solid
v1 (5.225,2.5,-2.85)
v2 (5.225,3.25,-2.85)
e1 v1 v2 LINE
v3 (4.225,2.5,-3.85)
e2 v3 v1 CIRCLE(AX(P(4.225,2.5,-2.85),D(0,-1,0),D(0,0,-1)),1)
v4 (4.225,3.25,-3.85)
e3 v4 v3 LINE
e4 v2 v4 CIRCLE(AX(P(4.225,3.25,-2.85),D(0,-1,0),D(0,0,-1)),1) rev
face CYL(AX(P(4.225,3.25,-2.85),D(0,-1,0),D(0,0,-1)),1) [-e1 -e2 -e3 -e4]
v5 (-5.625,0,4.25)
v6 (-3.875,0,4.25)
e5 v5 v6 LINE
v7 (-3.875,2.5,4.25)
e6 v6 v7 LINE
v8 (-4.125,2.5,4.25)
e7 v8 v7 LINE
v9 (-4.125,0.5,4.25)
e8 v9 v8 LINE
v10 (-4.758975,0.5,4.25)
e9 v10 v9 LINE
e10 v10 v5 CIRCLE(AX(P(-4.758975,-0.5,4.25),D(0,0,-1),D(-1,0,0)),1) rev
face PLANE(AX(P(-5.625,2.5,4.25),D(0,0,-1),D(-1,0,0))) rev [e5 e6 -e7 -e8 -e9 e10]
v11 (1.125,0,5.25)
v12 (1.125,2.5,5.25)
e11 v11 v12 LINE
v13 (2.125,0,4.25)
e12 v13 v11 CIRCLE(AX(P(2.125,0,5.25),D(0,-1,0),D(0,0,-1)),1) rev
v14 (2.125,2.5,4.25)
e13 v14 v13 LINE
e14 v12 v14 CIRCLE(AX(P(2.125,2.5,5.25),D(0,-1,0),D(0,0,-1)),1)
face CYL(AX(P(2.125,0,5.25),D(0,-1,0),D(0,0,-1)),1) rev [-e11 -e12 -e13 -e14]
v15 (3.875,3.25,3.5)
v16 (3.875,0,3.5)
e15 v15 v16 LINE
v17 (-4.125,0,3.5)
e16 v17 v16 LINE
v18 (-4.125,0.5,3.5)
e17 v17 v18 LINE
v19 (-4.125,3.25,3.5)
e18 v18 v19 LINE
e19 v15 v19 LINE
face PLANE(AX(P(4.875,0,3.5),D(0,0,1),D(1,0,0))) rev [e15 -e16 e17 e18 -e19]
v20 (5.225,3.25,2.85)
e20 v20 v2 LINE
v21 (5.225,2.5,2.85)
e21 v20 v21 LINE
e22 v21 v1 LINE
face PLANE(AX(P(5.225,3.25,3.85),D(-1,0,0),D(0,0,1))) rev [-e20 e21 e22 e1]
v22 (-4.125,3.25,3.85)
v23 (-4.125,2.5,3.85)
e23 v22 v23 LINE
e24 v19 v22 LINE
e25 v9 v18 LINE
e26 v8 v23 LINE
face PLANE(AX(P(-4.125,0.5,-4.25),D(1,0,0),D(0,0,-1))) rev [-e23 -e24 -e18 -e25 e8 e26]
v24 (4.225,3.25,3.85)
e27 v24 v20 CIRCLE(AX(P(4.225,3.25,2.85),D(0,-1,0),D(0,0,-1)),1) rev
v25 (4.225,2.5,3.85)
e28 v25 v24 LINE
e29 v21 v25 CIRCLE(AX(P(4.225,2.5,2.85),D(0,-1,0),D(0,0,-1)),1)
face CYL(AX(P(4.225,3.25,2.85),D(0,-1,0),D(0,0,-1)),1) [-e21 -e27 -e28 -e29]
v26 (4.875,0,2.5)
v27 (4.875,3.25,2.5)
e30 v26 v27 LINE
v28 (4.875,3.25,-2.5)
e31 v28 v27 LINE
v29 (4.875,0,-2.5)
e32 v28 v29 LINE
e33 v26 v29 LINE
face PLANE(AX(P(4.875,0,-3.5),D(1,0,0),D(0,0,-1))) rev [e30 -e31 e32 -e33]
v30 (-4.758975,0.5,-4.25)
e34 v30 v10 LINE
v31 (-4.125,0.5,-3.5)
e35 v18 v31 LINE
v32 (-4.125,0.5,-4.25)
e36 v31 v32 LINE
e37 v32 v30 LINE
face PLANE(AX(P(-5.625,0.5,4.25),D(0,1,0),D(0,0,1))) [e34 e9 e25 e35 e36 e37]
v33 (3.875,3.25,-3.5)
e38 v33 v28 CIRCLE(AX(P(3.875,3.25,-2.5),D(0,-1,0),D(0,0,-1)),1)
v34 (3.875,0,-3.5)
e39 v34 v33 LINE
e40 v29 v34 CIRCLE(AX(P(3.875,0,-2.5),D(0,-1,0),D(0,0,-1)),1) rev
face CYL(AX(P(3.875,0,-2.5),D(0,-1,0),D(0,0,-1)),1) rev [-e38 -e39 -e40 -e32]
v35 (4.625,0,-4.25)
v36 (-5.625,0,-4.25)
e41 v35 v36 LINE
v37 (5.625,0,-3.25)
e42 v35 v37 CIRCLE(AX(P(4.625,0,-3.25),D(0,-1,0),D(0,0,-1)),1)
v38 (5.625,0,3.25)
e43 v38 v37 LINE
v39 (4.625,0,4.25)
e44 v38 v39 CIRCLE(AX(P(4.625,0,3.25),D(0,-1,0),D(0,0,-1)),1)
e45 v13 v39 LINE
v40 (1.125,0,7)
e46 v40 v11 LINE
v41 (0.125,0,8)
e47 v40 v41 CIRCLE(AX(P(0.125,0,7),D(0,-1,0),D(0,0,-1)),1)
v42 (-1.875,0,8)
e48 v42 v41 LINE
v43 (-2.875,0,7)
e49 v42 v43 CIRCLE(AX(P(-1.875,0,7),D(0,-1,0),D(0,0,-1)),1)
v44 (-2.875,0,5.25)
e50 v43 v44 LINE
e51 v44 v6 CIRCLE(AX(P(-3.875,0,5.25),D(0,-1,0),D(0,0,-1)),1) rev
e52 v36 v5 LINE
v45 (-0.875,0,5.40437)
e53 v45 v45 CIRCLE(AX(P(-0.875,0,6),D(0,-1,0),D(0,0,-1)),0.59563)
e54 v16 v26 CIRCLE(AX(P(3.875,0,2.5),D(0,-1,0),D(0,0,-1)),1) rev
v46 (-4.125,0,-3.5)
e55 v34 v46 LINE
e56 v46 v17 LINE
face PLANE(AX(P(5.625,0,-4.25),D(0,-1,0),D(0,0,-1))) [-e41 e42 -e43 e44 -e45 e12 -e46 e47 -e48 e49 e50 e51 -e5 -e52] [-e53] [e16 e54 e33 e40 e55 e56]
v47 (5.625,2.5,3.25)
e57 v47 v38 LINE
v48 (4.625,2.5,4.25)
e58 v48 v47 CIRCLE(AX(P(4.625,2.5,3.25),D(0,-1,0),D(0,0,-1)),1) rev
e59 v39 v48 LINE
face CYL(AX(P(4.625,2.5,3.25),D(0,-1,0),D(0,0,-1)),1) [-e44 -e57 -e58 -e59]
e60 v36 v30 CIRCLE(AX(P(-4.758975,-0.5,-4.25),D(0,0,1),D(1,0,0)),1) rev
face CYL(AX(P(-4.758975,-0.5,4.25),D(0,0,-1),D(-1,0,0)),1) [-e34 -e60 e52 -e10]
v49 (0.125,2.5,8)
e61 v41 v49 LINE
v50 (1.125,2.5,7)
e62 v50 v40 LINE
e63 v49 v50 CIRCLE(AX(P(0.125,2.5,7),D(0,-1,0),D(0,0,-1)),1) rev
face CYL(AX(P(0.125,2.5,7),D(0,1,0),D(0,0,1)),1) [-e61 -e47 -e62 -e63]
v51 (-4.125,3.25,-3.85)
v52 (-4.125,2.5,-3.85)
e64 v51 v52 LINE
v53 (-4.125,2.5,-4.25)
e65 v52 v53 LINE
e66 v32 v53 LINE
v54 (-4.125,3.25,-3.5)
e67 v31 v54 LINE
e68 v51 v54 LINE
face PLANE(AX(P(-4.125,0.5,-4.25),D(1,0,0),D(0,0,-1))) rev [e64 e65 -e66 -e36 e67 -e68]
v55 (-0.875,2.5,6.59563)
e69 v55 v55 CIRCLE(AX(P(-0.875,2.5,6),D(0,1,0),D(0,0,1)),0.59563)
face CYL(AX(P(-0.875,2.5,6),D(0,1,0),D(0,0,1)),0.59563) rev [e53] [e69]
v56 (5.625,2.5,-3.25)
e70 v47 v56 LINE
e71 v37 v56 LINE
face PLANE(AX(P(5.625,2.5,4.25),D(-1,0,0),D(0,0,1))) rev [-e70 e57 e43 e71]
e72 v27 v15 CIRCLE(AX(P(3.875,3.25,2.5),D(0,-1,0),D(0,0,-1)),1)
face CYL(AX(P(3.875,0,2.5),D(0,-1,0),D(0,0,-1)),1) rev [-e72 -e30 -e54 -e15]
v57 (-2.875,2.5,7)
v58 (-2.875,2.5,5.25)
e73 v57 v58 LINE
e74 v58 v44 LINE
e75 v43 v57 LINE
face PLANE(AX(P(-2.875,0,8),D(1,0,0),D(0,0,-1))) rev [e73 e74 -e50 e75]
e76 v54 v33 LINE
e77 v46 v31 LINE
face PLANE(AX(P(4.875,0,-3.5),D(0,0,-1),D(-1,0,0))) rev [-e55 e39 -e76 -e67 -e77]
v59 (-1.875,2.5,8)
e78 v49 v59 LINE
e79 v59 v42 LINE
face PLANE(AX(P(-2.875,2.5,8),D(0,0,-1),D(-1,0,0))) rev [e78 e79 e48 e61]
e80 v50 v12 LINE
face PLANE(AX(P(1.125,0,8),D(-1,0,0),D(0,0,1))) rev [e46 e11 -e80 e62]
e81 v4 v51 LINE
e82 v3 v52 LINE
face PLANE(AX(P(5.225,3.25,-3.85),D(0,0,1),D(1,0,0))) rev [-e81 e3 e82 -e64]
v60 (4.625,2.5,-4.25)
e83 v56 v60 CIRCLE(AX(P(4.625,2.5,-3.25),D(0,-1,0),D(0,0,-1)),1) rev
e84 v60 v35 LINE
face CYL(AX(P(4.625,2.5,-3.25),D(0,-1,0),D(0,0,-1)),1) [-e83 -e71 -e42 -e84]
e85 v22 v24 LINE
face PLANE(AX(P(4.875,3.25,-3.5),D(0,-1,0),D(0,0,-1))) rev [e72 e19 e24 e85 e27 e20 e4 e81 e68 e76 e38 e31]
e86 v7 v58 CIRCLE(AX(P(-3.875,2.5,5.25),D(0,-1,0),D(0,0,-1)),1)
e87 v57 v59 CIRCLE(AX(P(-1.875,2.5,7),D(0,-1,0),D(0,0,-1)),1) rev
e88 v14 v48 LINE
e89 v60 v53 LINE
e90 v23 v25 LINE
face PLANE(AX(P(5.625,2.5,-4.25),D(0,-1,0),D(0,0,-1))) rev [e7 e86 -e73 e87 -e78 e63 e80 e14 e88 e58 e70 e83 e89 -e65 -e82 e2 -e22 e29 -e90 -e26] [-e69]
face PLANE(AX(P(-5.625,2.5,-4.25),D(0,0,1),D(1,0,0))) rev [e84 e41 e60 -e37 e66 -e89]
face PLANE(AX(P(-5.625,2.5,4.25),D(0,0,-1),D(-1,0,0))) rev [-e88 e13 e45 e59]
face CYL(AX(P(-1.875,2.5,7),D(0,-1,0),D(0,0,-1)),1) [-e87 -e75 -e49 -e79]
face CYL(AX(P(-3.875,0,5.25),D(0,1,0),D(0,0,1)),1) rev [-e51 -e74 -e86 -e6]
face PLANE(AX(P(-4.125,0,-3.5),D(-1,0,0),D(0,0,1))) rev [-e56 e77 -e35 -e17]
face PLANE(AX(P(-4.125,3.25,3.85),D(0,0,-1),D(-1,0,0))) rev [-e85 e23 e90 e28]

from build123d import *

# Parameters (mm, degrees)
SKETCH5_W                 = 11.25
SKETCH5_H                 = 8.5
EXTRUDE4_DEPTH            = 2.5
SKETCH19_W                = 1.5
SKETCH19_H                = 8.5
EXTRUDE12_DEPTH           = 2
SKETCH21_W                = 9
SKETCH21_H                = 7
EXTRUDE13_DEPTH           = 8.48018215
SKETCH22_W                = 4
SKETCH22_H                = 2.5
EXTRUDE14_DEPTH           = 3.75
EXTRUDE15_DEPTH           = 0.75
F_0_80_TAPPED_HOLE1_D     = 1.19126
F_0_80_TAPPED_HOLE1_DEPTH = 79.01
F_0_80_TAPPED_HOLE1_TIP   = 0.357890611
FILLET4_R                 = 1
FILLET5_R                 = 1


with BuildPart() as part:
    # Sketch5 → Extrude4 (new body)
    with BuildSketch(Plane(origin=(0, 0, 0), x_dir=(1, 0, 0), z_dir=(0, 1, 0))):
        Rectangle(SKETCH5_W, SKETCH5_H)
    extrude(amount=EXTRUDE4_DEPTH)

    # Sketch19 → Extrude12 (cut)
    with BuildSketch(Plane(origin=(0, 2.5, 0), x_dir=(-1, 0, 0), z_dir=(0, 1, 0))):
        with Locations((4.875, 0)):
            Rectangle(SKETCH19_W, SKETCH19_H)
    extrude(amount=-EXTRUDE12_DEPTH, mode=Mode.SUBTRACT)

    # Sketch21 → Extrude13 (cut, through all)
    with BuildSketch(Plane(origin=(0, 2.5, 0), x_dir=(-1, 0, 0), z_dir=(0, 1, 0))):
        with Locations((-0.375, 0)):
            Rectangle(SKETCH21_W, SKETCH21_H)
    extrude(amount=-EXTRUDE13_DEPTH, mode=Mode.SUBTRACT)

    # Sketch22 → Extrude14 (add)
    with BuildSketch(Plane.XY.offset(4.25)):
        with Locations((-0.875, 1.25)):
            Rectangle(SKETCH22_W, SKETCH22_H)
    extrude(amount=EXTRUDE14_DEPTH)

    # Sketch24 → Extrude15 (add)
    with BuildSketch(Plane(origin=(0, 2.5, 0), x_dir=(1, 0, 0), z_dir=(0, 1, 0))):
        Polygon((-4.125, 3.85), (-4.125, 3.5), (4.875, 3.5), (4.875, -3.5), (-4.125, -3.5), (-4.125, -3.85), (5.225, -3.85), (5.225, 3.85), align=None)
    extrude(amount=EXTRUDE15_DEPTH)

    # #0-80 Tapped Hole1
    with Locations(Plane(origin=(-0.875, 2.5, 6), x_dir=(0, 0, 1), z_dir=(0, 1, 0))):
        with Locations((0, 0)):
            Hole(F_0_80_TAPPED_HOLE1_D / 2, depth=F_0_80_TAPPED_HOLE1_DEPTH)
            with Locations((0, 0, -(F_0_80_TAPPED_HOLE1_DEPTH + F_0_80_TAPPED_HOLE1_TIP / 2))):  # 118° drill point
                Cone(0, F_0_80_TAPPED_HOLE1_D / 2, F_0_80_TAPPED_HOLE1_TIP, mode=Mode.SUBTRACT)

    # Fillet4
    fillet4_edges = [part.edges().sort_by_distance(p)[0] for p in [
        (5.625, 1.25, -4.25),
        (5.225, 2.875, -3.85),
        (5.625, 1.25, 4.25),
        (5.225, 2.875, 3.85),
        (-2.875, 1.25, 8),
        (1.125, 1.25, 8),
        (1.125, 1.25, 4.25),
        (-2.875, 1.25, 4.25),
        (4.875, 1.625, 3.5),
        (4.875, 1.625, -3.5),
    ]]
    fillet(fillet4_edges, radius=FILLET4_R)

    # Fillet5
    # the kernel refuses this fillet: 1 mm, written as the material it takes off along each edge
    with BuildSketch(Plane(origin=(-5.625, 0.5, 6.415063509), x_dir=(0, -1, 0), z_dir=(0, 0, -1))) as fillet5_piece_1:
        with BuildLine():
            CenterArc((1, -0.866025404), FILLET5_R, 120, 60)
            Line((0, -0.866025404), (-0.02, -0.866025404))
            Line((-0.02, -0.866025404), (-0.02, 0))
            Line((-0.02, 0), (0, 0.02))
            ThreePointArc((0, 0.02), (0.25, 0.02), (0.49, 0.017320508))
            Line((0.49, 0.017320508), (0.5, 0))
        make_face()
    extrude(amount=12.830127019, mode=Mode.SUBTRACT)


solid = part.part
